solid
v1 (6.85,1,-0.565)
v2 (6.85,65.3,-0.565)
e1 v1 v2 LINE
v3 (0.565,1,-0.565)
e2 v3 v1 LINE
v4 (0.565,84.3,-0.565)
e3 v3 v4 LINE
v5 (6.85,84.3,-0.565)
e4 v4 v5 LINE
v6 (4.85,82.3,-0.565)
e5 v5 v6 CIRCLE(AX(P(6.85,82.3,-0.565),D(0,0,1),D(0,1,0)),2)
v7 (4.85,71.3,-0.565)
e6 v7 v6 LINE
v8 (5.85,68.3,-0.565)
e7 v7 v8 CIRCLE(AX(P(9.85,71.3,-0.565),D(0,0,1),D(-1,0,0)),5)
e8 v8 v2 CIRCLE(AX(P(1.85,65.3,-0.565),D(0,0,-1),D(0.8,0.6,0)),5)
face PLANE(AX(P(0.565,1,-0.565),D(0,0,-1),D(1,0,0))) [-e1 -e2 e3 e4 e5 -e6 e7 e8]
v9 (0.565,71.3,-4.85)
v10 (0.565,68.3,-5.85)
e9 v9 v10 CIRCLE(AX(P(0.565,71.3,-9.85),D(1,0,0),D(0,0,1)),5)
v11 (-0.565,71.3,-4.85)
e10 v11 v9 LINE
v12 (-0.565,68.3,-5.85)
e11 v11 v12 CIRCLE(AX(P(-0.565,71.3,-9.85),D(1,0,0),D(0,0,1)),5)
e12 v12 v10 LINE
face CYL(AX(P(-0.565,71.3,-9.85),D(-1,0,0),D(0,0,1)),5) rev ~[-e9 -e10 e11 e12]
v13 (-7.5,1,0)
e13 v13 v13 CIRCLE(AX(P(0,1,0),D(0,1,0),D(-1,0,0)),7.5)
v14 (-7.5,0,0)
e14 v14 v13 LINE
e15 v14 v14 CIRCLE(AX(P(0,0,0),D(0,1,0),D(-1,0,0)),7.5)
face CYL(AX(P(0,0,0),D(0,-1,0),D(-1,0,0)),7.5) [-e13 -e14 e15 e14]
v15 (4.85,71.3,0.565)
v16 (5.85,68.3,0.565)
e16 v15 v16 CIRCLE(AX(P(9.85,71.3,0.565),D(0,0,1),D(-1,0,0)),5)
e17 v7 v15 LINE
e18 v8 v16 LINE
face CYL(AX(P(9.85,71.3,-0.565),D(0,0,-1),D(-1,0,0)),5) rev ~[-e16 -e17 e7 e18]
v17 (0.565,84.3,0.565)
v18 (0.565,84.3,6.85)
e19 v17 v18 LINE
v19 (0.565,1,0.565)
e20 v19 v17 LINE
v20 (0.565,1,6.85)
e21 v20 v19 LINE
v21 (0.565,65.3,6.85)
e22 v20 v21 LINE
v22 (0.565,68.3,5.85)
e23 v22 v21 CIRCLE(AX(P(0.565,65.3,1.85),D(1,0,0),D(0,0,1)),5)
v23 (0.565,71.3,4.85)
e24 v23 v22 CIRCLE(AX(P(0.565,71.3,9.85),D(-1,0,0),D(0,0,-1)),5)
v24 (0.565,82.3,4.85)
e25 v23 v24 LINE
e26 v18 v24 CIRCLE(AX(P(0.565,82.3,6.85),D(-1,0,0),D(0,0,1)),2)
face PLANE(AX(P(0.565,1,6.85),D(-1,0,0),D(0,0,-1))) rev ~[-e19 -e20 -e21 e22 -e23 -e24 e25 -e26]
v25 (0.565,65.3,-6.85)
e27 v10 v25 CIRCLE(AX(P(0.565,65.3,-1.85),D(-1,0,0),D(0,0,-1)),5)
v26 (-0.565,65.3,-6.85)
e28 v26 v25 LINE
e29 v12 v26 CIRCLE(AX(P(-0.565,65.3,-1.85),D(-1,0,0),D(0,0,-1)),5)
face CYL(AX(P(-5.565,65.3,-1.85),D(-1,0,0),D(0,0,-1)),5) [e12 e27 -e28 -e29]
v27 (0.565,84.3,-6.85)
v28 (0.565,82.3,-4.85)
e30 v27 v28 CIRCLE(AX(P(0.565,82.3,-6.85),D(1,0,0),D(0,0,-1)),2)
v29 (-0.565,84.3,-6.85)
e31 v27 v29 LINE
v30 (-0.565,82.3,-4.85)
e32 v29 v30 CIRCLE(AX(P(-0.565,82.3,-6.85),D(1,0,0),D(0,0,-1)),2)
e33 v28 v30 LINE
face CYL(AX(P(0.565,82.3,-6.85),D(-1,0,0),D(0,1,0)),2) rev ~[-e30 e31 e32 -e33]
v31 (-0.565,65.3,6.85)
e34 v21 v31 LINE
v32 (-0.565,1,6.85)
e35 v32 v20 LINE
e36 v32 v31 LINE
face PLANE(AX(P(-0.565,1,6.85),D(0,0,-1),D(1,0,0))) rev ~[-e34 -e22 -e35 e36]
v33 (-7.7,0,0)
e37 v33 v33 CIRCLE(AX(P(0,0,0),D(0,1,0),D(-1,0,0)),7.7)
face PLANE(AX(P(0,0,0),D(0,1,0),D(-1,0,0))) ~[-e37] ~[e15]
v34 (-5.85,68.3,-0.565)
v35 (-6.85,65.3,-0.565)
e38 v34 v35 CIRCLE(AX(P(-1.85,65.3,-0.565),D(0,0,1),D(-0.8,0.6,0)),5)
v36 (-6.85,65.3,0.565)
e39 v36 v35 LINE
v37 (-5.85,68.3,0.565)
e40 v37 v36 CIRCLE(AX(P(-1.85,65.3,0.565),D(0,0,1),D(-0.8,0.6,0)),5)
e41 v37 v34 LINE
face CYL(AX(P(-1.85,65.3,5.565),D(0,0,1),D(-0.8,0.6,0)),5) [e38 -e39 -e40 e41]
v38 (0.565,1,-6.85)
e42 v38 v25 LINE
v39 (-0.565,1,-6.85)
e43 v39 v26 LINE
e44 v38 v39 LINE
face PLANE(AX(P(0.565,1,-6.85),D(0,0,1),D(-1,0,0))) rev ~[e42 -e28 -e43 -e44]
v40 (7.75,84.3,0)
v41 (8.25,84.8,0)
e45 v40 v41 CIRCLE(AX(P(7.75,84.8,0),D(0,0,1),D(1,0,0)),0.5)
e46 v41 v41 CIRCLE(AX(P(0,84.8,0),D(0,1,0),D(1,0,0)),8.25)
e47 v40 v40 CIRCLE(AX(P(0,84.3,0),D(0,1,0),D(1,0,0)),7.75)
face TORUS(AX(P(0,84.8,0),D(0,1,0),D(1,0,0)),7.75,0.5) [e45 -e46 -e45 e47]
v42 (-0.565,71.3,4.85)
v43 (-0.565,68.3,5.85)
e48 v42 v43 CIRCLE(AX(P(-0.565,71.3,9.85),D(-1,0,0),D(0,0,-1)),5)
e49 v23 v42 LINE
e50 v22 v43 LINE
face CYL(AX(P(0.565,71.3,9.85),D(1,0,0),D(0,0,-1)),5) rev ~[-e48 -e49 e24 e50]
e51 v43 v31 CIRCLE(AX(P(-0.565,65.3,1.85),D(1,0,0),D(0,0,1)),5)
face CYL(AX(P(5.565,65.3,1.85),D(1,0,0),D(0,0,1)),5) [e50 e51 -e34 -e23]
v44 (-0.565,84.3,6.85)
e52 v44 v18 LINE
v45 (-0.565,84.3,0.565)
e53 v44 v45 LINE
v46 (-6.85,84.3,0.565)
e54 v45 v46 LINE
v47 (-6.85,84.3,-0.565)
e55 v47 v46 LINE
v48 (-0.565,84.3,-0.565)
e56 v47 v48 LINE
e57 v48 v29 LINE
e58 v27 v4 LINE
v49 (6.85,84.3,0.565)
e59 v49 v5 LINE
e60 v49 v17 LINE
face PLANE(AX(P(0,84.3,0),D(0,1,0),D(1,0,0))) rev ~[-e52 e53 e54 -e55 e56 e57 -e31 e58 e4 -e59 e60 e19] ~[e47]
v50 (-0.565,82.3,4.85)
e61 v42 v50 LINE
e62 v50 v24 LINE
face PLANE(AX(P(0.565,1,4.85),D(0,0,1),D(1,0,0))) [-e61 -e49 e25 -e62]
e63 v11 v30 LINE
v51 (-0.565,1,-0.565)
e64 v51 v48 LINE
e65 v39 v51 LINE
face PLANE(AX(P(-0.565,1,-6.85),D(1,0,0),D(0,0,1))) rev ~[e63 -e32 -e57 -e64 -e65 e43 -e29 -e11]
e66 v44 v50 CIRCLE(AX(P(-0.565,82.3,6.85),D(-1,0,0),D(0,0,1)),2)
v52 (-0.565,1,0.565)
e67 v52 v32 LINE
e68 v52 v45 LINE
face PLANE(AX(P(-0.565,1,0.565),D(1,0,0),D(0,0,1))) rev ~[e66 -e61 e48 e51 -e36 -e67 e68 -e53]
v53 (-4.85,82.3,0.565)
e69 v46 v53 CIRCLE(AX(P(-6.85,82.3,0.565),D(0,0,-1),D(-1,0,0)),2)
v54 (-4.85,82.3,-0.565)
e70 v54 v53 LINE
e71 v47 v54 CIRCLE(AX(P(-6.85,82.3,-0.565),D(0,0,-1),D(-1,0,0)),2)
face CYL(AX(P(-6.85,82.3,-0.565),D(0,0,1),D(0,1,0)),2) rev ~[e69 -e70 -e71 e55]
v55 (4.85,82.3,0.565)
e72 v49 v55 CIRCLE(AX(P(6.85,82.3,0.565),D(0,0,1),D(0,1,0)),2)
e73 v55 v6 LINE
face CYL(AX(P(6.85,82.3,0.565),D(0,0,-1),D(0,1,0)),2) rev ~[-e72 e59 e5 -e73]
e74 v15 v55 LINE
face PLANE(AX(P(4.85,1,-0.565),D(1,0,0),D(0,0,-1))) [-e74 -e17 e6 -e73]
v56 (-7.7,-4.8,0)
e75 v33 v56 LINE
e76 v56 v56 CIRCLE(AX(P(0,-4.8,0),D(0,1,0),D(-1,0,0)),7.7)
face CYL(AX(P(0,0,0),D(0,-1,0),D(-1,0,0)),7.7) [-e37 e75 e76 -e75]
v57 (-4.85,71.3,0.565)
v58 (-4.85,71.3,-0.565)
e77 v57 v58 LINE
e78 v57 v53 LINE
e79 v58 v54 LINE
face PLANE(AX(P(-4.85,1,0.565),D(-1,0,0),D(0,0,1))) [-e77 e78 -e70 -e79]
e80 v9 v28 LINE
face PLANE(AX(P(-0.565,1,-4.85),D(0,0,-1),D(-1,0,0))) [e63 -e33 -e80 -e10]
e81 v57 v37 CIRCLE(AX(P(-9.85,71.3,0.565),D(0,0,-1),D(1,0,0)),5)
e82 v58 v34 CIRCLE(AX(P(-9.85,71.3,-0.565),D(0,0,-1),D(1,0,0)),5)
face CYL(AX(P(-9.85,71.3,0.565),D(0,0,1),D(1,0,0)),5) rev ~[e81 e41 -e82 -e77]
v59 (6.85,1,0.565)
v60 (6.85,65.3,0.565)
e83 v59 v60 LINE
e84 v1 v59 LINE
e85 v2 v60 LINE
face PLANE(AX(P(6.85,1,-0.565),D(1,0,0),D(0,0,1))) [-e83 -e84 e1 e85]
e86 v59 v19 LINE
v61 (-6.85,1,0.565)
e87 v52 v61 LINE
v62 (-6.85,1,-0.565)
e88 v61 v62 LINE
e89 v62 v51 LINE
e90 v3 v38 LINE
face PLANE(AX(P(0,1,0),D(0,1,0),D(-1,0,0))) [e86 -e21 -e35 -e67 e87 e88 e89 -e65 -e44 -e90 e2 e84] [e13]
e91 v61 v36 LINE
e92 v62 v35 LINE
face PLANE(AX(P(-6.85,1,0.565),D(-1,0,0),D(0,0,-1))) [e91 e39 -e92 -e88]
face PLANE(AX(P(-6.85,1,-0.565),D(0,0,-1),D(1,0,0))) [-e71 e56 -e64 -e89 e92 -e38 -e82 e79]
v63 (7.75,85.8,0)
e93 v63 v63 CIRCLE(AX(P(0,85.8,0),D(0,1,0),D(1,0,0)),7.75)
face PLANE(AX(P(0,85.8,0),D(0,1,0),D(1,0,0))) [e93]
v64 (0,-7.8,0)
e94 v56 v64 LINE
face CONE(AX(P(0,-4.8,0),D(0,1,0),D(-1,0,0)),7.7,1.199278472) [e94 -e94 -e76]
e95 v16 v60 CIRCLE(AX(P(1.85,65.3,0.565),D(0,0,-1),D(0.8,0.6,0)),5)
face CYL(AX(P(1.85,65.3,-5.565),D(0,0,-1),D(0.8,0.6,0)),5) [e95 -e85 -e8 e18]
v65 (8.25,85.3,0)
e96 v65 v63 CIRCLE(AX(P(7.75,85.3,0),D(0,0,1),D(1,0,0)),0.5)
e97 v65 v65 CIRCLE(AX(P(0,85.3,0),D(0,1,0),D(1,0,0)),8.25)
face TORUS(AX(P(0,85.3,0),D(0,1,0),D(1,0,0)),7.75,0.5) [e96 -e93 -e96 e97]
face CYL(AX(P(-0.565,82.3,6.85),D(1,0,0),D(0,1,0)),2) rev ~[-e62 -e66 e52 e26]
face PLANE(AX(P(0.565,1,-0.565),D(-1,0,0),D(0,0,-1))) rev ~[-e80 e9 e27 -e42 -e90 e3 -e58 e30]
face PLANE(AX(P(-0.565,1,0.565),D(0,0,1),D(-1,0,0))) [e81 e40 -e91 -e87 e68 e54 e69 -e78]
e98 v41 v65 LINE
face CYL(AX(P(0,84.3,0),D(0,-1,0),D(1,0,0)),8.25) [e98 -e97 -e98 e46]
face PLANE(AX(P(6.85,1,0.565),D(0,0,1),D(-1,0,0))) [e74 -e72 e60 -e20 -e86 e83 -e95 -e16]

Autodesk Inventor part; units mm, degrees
ref_plane "YZ Plane" through (0, 0, 0) normal (1, 0, 0) x (0, 1, 0)
ref_plane "XZ Plane" through (0, 0, 0) normal (0, 1, 0) x (-1, 0, 0)
ref_plane "XY Plane" through (0, 0, 0) normal (0, 0, 1) x (1, 0, 0)
sketch "Sketch1" plane through (0, 0, 0) normal (0, 1, 0) x (-1, 0, 0)
  circle A0 centre (0, 0) radius 7.5
  dimension "d0" = 15
extrude "Extrusion1" add sketch "Sketch1" along normal blind 1
sketch "Sketch2" plane through (0, 1, 0) normal (0, 1, 0) x (1, 0, 0)
  line L0 (-0.565, -6.85) -> (0.565, -6.85)
  line L1 (0.565, -6.85) -> (0.565, 6.85)
  line L2 (0.565, 6.85) -> (-0.565, 6.85)
  line L3 (-0.565, 6.85) -> (-0.565, -6.85)
  line L4 (-0.565, -6.85) -> (0.565, 6.85) construction
  line L5 (0.565, -6.85) -> (-0.565, 6.85) construction
  line L6 (6.85, -0.565) -> (-6.85, -0.565)
  line L7 (-6.85, -0.565) -> (-6.85, 0.565)
  line L8 (-6.85, 0.565) -> (6.85, 0.565)
  line L9 (6.85, 0.565) -> (6.85, -0.565)
  line L10 (6.85, -0.565) -> (-6.85, 0.565) construction
  line L11 (-6.85, -0.565) -> (6.85, 0.565) construction
  point P0 (0, 0)
  point P1 (0.565, 0.565)
  point P2 (-0.565, 0.565)
  point P3 (-0.565, -0.565)
  point P4 (0.565, -0.565)
  dimension "d3" = 13.7
  dimension "d4" = 13.7
  dimension "d5" = 1.13
  dimension "d6" = 1.13
extrude "Extrusion2" add sketch "Sketch2" along normal blind 83.3
sketch "Sketch3" plane through (0, 84.3, 0) normal (0, 1, 0) x (1, 0, 0)
  circle A0 centre (0, 0) radius 8.25
  dimension "d9" = 16.5
extrude "Extrusion3" add sketch "Sketch3" along normal blind 1.5
sketch "Sketch4" plane through (6.85, 1, -0.565) normal (1, 0, 0) x (0, 0, -1)
  line L0 (-1.13, 0) -> (-1.13, 83.3) projected
  line L1 (0, 0) -> (0, 83.3) projected
  line L2 (-1.13, 83.3) -> (0, 83.3)
  line L3 (0, 83.3) -> (0, 66.3)
  line L4 (0, 66.3) -> (-1.13, 66.3)
  line L5 (-1.13, 66.3) -> (-1.13, 83.3)
  point P0 (-0.565, -1)
  dimension "d12" = 17
extrude "Extrusion4" cut sketch "Sketch4" against normal blind 2
pattern_circular "Circular Pattern1" count 4 over 360 about axis through (0, 84.3, 0) along (0, 1, 0) of "Extrusion4"
fillet "Fillet1" radius 5 8 edges at (4.85, 67.3, 0) (0, 67.3, -4.85) (-4.85, 67.3, 0) (0, 67.3, 4.85) (-6.85, 67.3, 0) (0, 67.3, 6.85) (0, 67.3, -6.85) (6.85, 67.3, 0)
fillet "Fillet2" radius 2 4 edges at (0, 84.3, -4.85) (-4.85, 84.3, 0) (0, 84.3, 4.85) (4.85, 84.3, 0)
fillet "Fillet3" radius 0.5 2 edges at (-8.25, 84.3, 0) (-8.25, 85.8, 0)
sketch "Sketch6" plane through (0, 0, 0) normal (0, 0, 1) x (1, 0, 0)
  line L0 (-7.7, 0) -> (-7.7, -4.8)
  line L1 (-7.7, -4.8) -> (0, -7.8)
  line L2 (0, -7.8) -> (0, 0)
  line L3 (0, 0) -> (-7.7, 0)
  line L4 (0, -26.52) -> (0, 104.52) projected
  dimension "d22" = 4.8
  dimension "d23" = 7.7
  dimension "d24" = 3
revolve "Revolution1" add sketch "Sketch6" angle 360 about axis through (0, 0, 0) along (0, 1, 0)
properties part number "10 mL syringe plunger"
